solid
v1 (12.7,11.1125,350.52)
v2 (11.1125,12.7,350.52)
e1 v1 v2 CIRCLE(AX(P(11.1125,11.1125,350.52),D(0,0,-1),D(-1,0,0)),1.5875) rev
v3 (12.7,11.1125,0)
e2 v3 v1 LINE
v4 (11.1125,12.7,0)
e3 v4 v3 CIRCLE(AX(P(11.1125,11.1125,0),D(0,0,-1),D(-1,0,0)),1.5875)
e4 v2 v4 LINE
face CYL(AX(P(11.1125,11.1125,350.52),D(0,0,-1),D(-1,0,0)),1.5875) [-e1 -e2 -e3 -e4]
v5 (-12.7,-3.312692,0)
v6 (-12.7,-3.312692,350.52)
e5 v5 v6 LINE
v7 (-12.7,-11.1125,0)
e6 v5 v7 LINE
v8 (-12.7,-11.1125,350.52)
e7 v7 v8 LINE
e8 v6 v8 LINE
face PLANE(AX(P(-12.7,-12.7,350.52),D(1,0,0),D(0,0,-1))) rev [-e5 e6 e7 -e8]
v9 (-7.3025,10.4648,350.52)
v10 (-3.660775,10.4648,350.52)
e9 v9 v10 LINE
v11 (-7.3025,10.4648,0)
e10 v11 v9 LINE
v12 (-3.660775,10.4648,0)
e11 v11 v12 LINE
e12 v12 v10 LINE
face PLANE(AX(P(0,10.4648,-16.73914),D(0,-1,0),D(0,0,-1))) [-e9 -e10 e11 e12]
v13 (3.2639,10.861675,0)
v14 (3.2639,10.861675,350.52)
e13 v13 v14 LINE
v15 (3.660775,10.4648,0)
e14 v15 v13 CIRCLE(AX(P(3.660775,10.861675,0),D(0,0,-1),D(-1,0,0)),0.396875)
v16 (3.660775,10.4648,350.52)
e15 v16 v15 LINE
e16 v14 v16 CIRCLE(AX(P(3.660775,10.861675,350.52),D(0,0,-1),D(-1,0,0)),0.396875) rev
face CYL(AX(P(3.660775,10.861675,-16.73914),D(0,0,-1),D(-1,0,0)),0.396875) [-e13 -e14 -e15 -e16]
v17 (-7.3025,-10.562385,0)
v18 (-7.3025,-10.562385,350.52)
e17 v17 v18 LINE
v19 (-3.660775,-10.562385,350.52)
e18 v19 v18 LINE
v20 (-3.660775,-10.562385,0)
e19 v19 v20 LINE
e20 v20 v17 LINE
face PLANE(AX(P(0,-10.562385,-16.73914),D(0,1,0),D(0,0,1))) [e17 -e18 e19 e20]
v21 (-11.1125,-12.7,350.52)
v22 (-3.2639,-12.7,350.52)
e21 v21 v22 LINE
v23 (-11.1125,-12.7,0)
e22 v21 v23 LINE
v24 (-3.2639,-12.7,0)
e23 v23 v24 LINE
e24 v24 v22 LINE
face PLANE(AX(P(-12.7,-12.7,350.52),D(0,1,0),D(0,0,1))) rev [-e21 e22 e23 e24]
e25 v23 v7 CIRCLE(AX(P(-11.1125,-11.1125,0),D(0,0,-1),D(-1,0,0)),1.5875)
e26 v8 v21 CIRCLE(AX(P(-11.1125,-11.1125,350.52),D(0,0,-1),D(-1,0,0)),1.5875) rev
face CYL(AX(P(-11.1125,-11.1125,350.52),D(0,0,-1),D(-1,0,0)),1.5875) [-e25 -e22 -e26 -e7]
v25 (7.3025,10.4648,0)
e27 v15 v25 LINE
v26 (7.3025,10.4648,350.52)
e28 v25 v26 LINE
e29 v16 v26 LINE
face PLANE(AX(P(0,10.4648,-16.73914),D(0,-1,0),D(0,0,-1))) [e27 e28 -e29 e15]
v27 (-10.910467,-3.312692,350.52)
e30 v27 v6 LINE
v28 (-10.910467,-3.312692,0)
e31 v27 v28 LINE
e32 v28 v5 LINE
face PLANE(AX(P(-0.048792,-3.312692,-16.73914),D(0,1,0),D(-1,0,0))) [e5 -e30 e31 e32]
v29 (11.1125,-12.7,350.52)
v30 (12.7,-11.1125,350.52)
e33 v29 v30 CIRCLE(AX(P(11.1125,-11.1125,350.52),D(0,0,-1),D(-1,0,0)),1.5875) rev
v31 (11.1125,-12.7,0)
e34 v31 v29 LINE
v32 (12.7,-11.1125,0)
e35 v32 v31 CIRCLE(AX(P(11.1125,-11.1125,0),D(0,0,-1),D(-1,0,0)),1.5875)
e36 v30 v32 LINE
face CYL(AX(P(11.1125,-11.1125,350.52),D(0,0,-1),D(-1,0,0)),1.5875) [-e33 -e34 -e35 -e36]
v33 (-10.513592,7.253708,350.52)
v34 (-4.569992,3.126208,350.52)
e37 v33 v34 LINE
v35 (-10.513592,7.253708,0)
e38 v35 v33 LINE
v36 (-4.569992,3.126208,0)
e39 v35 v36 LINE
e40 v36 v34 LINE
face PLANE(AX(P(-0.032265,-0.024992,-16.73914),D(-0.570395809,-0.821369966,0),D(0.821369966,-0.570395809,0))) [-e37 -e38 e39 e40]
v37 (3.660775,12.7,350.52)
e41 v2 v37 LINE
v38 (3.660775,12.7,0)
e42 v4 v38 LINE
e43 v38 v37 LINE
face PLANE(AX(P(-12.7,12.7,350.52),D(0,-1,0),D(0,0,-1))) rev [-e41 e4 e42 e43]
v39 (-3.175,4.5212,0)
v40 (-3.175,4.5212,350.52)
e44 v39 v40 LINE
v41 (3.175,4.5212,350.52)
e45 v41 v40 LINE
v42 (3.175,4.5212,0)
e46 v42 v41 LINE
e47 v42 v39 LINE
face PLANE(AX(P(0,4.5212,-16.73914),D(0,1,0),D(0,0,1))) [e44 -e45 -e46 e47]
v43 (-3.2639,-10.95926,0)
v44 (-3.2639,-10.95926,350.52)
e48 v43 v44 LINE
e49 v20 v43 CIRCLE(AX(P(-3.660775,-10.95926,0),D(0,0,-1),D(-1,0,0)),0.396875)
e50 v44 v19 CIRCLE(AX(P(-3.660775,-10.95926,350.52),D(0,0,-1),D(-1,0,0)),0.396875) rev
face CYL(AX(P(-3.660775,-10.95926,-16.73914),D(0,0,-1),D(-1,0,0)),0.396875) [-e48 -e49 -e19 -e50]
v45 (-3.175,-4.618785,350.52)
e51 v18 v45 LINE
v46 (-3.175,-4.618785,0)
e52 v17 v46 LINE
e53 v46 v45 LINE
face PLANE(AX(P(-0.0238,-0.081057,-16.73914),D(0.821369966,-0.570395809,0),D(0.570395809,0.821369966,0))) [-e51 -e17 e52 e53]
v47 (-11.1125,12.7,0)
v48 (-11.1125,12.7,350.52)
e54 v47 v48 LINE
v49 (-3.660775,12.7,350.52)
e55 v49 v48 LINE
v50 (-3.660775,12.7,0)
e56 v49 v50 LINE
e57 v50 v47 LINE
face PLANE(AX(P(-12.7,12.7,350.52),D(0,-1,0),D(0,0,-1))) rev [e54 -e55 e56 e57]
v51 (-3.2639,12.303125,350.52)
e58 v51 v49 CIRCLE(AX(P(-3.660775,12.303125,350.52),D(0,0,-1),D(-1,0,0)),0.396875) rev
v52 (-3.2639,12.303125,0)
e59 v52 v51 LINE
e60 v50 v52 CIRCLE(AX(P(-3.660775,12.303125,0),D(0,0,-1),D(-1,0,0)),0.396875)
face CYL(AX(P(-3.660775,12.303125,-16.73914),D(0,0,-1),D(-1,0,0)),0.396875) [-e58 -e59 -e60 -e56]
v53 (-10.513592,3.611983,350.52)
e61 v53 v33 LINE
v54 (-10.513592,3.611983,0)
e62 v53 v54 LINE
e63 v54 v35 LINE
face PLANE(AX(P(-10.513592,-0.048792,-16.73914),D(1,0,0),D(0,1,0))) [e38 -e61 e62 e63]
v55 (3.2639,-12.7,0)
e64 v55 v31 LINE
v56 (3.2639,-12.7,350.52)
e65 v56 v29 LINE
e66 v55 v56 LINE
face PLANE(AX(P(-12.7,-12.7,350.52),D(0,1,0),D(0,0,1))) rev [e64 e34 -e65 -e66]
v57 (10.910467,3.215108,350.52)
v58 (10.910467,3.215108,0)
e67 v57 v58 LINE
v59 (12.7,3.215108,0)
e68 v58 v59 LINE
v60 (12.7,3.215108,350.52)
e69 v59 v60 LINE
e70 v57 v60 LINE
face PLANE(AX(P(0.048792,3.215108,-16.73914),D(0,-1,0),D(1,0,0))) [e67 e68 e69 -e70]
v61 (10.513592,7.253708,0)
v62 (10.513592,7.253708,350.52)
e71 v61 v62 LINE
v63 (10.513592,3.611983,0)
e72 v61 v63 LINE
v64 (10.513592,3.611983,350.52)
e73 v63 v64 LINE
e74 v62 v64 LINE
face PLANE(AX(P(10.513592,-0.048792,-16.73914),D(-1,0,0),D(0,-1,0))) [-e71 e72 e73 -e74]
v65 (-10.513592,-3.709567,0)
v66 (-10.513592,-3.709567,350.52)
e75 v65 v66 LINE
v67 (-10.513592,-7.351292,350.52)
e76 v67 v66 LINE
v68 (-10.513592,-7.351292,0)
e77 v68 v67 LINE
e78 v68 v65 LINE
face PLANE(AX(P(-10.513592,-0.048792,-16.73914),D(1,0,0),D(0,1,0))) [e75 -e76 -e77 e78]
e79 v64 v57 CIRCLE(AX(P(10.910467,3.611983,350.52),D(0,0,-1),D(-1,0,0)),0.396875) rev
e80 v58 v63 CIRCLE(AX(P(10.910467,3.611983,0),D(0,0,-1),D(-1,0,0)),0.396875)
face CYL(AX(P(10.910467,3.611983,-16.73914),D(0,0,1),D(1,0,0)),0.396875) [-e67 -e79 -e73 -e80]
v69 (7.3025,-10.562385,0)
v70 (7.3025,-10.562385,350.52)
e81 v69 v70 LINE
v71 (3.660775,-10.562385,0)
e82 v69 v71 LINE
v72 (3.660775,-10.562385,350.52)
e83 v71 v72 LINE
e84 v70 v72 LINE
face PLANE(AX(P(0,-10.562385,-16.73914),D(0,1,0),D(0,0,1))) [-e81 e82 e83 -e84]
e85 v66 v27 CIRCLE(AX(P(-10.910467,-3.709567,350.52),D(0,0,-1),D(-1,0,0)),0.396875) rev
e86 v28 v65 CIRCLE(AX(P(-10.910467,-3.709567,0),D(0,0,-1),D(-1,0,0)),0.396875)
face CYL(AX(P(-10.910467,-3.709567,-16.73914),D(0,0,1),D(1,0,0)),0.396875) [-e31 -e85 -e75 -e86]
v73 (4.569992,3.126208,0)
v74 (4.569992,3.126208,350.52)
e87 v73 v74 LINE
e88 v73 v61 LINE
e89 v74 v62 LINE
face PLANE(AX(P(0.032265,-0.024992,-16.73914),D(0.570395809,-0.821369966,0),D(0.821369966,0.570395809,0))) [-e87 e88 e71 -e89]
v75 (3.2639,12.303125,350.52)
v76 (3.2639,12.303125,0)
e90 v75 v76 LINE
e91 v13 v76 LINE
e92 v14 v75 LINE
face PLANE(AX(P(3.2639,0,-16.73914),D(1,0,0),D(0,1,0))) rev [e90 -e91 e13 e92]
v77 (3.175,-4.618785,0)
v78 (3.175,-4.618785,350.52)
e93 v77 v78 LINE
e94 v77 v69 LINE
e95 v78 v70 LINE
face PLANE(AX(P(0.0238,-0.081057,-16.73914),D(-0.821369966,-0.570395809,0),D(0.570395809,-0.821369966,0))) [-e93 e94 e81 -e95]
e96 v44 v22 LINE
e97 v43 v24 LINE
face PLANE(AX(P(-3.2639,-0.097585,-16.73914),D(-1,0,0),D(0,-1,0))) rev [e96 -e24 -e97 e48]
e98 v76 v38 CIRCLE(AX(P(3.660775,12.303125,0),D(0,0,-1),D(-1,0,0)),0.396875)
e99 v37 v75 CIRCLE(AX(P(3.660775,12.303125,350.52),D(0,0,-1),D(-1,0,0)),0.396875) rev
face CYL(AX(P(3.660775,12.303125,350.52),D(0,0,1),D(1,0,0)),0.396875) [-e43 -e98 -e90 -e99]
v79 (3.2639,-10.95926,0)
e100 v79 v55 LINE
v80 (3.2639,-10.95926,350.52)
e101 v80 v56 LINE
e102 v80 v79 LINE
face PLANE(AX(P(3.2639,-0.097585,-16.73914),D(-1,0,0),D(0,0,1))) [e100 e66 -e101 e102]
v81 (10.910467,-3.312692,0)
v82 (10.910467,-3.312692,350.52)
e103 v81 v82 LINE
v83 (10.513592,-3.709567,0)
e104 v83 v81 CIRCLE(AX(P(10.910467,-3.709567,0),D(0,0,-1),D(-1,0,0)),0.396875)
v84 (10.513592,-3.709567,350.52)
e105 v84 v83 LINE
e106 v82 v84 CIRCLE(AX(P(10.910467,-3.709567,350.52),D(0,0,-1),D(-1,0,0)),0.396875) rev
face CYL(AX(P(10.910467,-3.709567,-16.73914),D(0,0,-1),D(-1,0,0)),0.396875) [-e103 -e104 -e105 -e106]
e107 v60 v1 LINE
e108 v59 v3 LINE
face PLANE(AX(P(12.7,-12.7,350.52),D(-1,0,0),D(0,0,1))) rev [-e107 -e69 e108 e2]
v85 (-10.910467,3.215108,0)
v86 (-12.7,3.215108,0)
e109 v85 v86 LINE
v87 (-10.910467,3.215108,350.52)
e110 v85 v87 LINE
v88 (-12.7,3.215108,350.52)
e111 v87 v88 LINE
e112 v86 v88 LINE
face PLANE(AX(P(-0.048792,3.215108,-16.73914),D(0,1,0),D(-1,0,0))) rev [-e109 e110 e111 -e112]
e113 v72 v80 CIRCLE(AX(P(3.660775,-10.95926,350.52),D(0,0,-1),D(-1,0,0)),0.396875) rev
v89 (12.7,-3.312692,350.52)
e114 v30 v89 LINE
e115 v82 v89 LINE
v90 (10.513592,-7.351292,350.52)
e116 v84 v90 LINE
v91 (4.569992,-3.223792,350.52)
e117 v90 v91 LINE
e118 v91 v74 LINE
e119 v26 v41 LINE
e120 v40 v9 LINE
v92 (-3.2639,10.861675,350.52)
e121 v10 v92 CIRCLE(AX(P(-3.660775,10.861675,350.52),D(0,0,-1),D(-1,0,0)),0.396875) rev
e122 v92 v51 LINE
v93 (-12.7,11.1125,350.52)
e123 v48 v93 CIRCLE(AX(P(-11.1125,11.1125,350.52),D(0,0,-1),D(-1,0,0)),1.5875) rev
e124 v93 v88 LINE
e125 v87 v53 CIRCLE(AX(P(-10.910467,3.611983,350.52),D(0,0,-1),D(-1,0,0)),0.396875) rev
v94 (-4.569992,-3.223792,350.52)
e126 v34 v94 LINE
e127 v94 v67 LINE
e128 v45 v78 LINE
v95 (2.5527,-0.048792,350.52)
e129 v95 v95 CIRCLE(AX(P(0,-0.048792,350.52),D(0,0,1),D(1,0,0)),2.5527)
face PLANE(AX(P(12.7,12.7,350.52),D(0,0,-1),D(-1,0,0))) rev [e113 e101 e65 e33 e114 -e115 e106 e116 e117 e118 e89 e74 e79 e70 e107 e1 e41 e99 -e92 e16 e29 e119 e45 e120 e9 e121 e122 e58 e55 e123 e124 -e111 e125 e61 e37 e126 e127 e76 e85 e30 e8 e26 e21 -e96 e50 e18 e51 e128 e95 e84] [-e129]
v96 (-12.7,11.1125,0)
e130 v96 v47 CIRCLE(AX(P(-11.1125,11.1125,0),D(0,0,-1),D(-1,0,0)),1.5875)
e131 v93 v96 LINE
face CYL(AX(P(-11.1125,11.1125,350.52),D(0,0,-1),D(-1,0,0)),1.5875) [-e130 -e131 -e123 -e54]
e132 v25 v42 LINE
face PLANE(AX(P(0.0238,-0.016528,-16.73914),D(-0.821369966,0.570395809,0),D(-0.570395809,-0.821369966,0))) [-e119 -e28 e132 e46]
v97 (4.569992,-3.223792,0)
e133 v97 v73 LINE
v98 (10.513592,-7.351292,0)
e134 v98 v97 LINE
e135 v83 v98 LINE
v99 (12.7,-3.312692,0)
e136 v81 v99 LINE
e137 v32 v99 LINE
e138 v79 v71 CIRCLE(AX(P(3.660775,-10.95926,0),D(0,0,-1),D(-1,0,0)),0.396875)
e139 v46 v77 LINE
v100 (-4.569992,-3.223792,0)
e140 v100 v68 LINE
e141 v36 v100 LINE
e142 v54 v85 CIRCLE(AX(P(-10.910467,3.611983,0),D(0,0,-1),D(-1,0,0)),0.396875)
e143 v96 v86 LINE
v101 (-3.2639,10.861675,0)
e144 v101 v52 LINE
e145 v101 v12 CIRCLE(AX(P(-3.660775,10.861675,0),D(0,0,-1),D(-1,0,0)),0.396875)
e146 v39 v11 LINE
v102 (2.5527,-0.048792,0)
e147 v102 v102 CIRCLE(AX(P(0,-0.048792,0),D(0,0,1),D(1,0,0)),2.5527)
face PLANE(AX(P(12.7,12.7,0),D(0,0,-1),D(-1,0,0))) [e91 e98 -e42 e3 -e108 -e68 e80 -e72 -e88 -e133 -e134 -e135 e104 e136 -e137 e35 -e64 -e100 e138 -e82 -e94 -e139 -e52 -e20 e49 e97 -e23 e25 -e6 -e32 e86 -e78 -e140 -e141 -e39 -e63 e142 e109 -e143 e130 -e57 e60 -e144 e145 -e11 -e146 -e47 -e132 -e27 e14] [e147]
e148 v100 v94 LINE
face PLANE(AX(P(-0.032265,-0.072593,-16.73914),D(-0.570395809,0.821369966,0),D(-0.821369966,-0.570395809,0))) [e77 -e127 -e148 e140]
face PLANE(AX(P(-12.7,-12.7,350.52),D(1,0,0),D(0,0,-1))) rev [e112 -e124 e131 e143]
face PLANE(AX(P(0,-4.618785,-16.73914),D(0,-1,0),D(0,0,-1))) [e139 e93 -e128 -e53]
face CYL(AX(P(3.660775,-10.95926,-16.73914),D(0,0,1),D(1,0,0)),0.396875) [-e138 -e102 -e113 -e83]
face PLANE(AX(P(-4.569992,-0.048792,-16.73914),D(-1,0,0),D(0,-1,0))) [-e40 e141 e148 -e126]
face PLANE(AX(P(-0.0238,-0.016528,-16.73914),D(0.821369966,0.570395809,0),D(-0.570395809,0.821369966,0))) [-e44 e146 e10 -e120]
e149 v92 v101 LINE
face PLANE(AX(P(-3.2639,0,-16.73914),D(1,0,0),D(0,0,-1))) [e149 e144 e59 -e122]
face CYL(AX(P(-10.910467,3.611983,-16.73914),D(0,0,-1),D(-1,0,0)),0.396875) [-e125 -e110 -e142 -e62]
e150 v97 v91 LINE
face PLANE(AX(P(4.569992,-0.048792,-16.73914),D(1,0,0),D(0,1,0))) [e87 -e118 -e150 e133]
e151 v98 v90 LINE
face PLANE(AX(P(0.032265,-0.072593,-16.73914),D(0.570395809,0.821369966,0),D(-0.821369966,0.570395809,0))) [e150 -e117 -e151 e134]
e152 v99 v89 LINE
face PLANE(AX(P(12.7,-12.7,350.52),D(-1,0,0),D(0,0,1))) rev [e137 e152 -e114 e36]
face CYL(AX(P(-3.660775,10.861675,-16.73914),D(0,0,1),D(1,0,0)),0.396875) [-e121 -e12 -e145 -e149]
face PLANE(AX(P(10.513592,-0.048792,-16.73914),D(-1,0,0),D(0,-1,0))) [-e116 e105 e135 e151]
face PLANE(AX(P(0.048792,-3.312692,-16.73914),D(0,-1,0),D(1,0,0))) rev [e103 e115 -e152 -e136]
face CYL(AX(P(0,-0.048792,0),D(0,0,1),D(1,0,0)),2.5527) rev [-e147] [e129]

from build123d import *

# Parameters (mm, degrees)
SKETCH1_W           = 25.4
SKETCH1_H           = 25.4
BOSS_EXTRUDE1_DEPTH = 350.52
FILLET1_R           = 1.5875
HOLE1_OUTLINE_R     = 2.5527
HOLE1_DEPTH         = 350.52
SKETCH7_W           = 6.5278
SKETCH7_H           = 2.2352
CUT_EXTRUDE2_DEPTH  = 350.52
FILLET4_R           = 0.396875
CIRPATTERN2_DEPTH   = 350.52


# Read off the part's stored shape, not the designer's step: Hole1, CirPattern2
with BuildPart() as part:
    # Sketch1 → Boss-Extrude1 (new body)
    with BuildSketch(Plane.XY):
        Rectangle(SKETCH1_W, SKETCH1_H)
    extrude(amount=BOSS_EXTRUDE1_DEPTH)

    # Fillet1
    fillet1_edges = [part.edges().sort_by_distance(p)[0] for p in [
        (12.7, -12.7, 175.26),
        (-12.7, -12.7, 175.26),
        (-12.7, 12.7, 175.26),
        (12.7, 12.7, 175.26),
    ]]
    fillet(fillet1_edges, radius=FILLET1_R)

    # Hole1 outline → Hole1 (cut)
    with BuildSketch(Plane.XY):
        with Locations((0, -0.048792482)):
            Circle(HOLE1_OUTLINE_R)
    extrude(amount=HOLE1_DEPTH, mode=Mode.SUBTRACT)

    # Sketch7 → Cut-Extrude2 (cut)
    with BuildSketch(Plane.XY.offset(350.52)):
        with Locations((0, 11.5824)):
            Rectangle(SKETCH7_W, SKETCH7_H)
        Polygon((-3.175, 4.5212), (-7.3025, 10.4648), (7.3025, 10.4648), (3.175, 4.5212), align=None)
    extrude(amount=-CUT_EXTRUDE2_DEPTH, mode=Mode.SUBTRACT)

    # Fillet4
    fillet4_edges = [part.edges().sort_by_distance(p)[0] for p in [
        (-3.2639, 10.4648, 175.26),
        (-3.2639, 12.7, 175.26),
        (3.2639, 12.7, 175.26),
        (3.2639, 10.4648, 175.26),
    ]]
    fillet(fillet4_edges, radius=FILLET4_R)

    # CirPattern2 outline → CirPattern2 (cut)
    with BuildSketch(Plane.XY):
        with BuildLine():
            ThreePointArc((-3.660775, -10.562384964), (-3.380141996, -10.67862696), (-3.2639, -10.959259964))
            Line((-3.2639, -10.959259964), (-3.2639, -12.7))
            Line((-3.2639, -12.7), (3.2639, -12.7))
            Line((3.2639, -12.7), (3.2639, -10.959259964))
            ThreePointArc((3.2639, -10.959259964), (3.380141996, -10.67862696), (3.660775, -10.562384964))
            Line((3.660775, -10.562384964), (7.3025, -10.562384964))
            Line((7.3025, -10.562384964), (3.175, -4.618784964))
            Line((3.175, -4.618784964), (-3.175, -4.618784964))
            Line((-3.175, -4.618784964), (-7.3025, -10.562384964))
            Line((-7.3025, -10.562384964), (-3.660775, -10.562384964))
        make_face()
        with BuildLine():
            Line((-12.7, -3.312692482), (-10.910467482, -3.312692482))
            ThreePointArc((-10.910467482, -3.312692482), (-10.629834478, -3.428934478), (-10.513592482, -3.709567482))
            Line((-10.513592482, -3.709567482), (-10.513592482, -7.351292482))
            Line((-10.513592482, -7.351292482), (-4.569992482, -3.223792482))
            Line((-4.569992482, -3.223792482), (-4.569992482, 3.126207518))
            Line((-4.569992482, 3.126207518), (-10.513592482, 7.253707518))
            Line((-10.513592482, 7.253707518), (-10.513592482, 3.611982518))
            ThreePointArc((-10.513592482, 3.611982518), (-10.629834478, 3.331349514), (-10.910467482, 3.215107518))
            Line((-10.910467482, 3.215107518), (-12.7, 3.215107518))
            Line((-12.7, 3.215107518), (-12.7, -3.312692482))
        make_face()
        with BuildLine():
            ThreePointArc((10.513592482, -3.709567482), (10.629834478, -3.428934478), (10.910467482, -3.312692482))
            Line((10.910467482, -3.312692482), (12.7, -3.312692482))
            Line((12.7, -3.312692482), (12.7, 3.215107518))
            Line((12.7, 3.215107518), (10.910467482, 3.215107518))
            ThreePointArc((10.910467482, 3.215107518), (10.629834478, 3.331349514), (10.513592482, 3.611982518))
            Line((10.513592482, 3.611982518), (10.513592482, 7.253707518))
            Line((10.513592482, 7.253707518), (4.569992482, 3.126207518))
            Line((4.569992482, 3.126207518), (4.569992482, -3.223792482))
            Line((4.569992482, -3.223792482), (10.513592482, -7.351292482))
            Line((10.513592482, -7.351292482), (10.513592482, -3.709567482))
        make_face()
    extrude(amount=CIRPATTERN2_DEPTH, mode=Mode.SUBTRACT)


solid = part.part
